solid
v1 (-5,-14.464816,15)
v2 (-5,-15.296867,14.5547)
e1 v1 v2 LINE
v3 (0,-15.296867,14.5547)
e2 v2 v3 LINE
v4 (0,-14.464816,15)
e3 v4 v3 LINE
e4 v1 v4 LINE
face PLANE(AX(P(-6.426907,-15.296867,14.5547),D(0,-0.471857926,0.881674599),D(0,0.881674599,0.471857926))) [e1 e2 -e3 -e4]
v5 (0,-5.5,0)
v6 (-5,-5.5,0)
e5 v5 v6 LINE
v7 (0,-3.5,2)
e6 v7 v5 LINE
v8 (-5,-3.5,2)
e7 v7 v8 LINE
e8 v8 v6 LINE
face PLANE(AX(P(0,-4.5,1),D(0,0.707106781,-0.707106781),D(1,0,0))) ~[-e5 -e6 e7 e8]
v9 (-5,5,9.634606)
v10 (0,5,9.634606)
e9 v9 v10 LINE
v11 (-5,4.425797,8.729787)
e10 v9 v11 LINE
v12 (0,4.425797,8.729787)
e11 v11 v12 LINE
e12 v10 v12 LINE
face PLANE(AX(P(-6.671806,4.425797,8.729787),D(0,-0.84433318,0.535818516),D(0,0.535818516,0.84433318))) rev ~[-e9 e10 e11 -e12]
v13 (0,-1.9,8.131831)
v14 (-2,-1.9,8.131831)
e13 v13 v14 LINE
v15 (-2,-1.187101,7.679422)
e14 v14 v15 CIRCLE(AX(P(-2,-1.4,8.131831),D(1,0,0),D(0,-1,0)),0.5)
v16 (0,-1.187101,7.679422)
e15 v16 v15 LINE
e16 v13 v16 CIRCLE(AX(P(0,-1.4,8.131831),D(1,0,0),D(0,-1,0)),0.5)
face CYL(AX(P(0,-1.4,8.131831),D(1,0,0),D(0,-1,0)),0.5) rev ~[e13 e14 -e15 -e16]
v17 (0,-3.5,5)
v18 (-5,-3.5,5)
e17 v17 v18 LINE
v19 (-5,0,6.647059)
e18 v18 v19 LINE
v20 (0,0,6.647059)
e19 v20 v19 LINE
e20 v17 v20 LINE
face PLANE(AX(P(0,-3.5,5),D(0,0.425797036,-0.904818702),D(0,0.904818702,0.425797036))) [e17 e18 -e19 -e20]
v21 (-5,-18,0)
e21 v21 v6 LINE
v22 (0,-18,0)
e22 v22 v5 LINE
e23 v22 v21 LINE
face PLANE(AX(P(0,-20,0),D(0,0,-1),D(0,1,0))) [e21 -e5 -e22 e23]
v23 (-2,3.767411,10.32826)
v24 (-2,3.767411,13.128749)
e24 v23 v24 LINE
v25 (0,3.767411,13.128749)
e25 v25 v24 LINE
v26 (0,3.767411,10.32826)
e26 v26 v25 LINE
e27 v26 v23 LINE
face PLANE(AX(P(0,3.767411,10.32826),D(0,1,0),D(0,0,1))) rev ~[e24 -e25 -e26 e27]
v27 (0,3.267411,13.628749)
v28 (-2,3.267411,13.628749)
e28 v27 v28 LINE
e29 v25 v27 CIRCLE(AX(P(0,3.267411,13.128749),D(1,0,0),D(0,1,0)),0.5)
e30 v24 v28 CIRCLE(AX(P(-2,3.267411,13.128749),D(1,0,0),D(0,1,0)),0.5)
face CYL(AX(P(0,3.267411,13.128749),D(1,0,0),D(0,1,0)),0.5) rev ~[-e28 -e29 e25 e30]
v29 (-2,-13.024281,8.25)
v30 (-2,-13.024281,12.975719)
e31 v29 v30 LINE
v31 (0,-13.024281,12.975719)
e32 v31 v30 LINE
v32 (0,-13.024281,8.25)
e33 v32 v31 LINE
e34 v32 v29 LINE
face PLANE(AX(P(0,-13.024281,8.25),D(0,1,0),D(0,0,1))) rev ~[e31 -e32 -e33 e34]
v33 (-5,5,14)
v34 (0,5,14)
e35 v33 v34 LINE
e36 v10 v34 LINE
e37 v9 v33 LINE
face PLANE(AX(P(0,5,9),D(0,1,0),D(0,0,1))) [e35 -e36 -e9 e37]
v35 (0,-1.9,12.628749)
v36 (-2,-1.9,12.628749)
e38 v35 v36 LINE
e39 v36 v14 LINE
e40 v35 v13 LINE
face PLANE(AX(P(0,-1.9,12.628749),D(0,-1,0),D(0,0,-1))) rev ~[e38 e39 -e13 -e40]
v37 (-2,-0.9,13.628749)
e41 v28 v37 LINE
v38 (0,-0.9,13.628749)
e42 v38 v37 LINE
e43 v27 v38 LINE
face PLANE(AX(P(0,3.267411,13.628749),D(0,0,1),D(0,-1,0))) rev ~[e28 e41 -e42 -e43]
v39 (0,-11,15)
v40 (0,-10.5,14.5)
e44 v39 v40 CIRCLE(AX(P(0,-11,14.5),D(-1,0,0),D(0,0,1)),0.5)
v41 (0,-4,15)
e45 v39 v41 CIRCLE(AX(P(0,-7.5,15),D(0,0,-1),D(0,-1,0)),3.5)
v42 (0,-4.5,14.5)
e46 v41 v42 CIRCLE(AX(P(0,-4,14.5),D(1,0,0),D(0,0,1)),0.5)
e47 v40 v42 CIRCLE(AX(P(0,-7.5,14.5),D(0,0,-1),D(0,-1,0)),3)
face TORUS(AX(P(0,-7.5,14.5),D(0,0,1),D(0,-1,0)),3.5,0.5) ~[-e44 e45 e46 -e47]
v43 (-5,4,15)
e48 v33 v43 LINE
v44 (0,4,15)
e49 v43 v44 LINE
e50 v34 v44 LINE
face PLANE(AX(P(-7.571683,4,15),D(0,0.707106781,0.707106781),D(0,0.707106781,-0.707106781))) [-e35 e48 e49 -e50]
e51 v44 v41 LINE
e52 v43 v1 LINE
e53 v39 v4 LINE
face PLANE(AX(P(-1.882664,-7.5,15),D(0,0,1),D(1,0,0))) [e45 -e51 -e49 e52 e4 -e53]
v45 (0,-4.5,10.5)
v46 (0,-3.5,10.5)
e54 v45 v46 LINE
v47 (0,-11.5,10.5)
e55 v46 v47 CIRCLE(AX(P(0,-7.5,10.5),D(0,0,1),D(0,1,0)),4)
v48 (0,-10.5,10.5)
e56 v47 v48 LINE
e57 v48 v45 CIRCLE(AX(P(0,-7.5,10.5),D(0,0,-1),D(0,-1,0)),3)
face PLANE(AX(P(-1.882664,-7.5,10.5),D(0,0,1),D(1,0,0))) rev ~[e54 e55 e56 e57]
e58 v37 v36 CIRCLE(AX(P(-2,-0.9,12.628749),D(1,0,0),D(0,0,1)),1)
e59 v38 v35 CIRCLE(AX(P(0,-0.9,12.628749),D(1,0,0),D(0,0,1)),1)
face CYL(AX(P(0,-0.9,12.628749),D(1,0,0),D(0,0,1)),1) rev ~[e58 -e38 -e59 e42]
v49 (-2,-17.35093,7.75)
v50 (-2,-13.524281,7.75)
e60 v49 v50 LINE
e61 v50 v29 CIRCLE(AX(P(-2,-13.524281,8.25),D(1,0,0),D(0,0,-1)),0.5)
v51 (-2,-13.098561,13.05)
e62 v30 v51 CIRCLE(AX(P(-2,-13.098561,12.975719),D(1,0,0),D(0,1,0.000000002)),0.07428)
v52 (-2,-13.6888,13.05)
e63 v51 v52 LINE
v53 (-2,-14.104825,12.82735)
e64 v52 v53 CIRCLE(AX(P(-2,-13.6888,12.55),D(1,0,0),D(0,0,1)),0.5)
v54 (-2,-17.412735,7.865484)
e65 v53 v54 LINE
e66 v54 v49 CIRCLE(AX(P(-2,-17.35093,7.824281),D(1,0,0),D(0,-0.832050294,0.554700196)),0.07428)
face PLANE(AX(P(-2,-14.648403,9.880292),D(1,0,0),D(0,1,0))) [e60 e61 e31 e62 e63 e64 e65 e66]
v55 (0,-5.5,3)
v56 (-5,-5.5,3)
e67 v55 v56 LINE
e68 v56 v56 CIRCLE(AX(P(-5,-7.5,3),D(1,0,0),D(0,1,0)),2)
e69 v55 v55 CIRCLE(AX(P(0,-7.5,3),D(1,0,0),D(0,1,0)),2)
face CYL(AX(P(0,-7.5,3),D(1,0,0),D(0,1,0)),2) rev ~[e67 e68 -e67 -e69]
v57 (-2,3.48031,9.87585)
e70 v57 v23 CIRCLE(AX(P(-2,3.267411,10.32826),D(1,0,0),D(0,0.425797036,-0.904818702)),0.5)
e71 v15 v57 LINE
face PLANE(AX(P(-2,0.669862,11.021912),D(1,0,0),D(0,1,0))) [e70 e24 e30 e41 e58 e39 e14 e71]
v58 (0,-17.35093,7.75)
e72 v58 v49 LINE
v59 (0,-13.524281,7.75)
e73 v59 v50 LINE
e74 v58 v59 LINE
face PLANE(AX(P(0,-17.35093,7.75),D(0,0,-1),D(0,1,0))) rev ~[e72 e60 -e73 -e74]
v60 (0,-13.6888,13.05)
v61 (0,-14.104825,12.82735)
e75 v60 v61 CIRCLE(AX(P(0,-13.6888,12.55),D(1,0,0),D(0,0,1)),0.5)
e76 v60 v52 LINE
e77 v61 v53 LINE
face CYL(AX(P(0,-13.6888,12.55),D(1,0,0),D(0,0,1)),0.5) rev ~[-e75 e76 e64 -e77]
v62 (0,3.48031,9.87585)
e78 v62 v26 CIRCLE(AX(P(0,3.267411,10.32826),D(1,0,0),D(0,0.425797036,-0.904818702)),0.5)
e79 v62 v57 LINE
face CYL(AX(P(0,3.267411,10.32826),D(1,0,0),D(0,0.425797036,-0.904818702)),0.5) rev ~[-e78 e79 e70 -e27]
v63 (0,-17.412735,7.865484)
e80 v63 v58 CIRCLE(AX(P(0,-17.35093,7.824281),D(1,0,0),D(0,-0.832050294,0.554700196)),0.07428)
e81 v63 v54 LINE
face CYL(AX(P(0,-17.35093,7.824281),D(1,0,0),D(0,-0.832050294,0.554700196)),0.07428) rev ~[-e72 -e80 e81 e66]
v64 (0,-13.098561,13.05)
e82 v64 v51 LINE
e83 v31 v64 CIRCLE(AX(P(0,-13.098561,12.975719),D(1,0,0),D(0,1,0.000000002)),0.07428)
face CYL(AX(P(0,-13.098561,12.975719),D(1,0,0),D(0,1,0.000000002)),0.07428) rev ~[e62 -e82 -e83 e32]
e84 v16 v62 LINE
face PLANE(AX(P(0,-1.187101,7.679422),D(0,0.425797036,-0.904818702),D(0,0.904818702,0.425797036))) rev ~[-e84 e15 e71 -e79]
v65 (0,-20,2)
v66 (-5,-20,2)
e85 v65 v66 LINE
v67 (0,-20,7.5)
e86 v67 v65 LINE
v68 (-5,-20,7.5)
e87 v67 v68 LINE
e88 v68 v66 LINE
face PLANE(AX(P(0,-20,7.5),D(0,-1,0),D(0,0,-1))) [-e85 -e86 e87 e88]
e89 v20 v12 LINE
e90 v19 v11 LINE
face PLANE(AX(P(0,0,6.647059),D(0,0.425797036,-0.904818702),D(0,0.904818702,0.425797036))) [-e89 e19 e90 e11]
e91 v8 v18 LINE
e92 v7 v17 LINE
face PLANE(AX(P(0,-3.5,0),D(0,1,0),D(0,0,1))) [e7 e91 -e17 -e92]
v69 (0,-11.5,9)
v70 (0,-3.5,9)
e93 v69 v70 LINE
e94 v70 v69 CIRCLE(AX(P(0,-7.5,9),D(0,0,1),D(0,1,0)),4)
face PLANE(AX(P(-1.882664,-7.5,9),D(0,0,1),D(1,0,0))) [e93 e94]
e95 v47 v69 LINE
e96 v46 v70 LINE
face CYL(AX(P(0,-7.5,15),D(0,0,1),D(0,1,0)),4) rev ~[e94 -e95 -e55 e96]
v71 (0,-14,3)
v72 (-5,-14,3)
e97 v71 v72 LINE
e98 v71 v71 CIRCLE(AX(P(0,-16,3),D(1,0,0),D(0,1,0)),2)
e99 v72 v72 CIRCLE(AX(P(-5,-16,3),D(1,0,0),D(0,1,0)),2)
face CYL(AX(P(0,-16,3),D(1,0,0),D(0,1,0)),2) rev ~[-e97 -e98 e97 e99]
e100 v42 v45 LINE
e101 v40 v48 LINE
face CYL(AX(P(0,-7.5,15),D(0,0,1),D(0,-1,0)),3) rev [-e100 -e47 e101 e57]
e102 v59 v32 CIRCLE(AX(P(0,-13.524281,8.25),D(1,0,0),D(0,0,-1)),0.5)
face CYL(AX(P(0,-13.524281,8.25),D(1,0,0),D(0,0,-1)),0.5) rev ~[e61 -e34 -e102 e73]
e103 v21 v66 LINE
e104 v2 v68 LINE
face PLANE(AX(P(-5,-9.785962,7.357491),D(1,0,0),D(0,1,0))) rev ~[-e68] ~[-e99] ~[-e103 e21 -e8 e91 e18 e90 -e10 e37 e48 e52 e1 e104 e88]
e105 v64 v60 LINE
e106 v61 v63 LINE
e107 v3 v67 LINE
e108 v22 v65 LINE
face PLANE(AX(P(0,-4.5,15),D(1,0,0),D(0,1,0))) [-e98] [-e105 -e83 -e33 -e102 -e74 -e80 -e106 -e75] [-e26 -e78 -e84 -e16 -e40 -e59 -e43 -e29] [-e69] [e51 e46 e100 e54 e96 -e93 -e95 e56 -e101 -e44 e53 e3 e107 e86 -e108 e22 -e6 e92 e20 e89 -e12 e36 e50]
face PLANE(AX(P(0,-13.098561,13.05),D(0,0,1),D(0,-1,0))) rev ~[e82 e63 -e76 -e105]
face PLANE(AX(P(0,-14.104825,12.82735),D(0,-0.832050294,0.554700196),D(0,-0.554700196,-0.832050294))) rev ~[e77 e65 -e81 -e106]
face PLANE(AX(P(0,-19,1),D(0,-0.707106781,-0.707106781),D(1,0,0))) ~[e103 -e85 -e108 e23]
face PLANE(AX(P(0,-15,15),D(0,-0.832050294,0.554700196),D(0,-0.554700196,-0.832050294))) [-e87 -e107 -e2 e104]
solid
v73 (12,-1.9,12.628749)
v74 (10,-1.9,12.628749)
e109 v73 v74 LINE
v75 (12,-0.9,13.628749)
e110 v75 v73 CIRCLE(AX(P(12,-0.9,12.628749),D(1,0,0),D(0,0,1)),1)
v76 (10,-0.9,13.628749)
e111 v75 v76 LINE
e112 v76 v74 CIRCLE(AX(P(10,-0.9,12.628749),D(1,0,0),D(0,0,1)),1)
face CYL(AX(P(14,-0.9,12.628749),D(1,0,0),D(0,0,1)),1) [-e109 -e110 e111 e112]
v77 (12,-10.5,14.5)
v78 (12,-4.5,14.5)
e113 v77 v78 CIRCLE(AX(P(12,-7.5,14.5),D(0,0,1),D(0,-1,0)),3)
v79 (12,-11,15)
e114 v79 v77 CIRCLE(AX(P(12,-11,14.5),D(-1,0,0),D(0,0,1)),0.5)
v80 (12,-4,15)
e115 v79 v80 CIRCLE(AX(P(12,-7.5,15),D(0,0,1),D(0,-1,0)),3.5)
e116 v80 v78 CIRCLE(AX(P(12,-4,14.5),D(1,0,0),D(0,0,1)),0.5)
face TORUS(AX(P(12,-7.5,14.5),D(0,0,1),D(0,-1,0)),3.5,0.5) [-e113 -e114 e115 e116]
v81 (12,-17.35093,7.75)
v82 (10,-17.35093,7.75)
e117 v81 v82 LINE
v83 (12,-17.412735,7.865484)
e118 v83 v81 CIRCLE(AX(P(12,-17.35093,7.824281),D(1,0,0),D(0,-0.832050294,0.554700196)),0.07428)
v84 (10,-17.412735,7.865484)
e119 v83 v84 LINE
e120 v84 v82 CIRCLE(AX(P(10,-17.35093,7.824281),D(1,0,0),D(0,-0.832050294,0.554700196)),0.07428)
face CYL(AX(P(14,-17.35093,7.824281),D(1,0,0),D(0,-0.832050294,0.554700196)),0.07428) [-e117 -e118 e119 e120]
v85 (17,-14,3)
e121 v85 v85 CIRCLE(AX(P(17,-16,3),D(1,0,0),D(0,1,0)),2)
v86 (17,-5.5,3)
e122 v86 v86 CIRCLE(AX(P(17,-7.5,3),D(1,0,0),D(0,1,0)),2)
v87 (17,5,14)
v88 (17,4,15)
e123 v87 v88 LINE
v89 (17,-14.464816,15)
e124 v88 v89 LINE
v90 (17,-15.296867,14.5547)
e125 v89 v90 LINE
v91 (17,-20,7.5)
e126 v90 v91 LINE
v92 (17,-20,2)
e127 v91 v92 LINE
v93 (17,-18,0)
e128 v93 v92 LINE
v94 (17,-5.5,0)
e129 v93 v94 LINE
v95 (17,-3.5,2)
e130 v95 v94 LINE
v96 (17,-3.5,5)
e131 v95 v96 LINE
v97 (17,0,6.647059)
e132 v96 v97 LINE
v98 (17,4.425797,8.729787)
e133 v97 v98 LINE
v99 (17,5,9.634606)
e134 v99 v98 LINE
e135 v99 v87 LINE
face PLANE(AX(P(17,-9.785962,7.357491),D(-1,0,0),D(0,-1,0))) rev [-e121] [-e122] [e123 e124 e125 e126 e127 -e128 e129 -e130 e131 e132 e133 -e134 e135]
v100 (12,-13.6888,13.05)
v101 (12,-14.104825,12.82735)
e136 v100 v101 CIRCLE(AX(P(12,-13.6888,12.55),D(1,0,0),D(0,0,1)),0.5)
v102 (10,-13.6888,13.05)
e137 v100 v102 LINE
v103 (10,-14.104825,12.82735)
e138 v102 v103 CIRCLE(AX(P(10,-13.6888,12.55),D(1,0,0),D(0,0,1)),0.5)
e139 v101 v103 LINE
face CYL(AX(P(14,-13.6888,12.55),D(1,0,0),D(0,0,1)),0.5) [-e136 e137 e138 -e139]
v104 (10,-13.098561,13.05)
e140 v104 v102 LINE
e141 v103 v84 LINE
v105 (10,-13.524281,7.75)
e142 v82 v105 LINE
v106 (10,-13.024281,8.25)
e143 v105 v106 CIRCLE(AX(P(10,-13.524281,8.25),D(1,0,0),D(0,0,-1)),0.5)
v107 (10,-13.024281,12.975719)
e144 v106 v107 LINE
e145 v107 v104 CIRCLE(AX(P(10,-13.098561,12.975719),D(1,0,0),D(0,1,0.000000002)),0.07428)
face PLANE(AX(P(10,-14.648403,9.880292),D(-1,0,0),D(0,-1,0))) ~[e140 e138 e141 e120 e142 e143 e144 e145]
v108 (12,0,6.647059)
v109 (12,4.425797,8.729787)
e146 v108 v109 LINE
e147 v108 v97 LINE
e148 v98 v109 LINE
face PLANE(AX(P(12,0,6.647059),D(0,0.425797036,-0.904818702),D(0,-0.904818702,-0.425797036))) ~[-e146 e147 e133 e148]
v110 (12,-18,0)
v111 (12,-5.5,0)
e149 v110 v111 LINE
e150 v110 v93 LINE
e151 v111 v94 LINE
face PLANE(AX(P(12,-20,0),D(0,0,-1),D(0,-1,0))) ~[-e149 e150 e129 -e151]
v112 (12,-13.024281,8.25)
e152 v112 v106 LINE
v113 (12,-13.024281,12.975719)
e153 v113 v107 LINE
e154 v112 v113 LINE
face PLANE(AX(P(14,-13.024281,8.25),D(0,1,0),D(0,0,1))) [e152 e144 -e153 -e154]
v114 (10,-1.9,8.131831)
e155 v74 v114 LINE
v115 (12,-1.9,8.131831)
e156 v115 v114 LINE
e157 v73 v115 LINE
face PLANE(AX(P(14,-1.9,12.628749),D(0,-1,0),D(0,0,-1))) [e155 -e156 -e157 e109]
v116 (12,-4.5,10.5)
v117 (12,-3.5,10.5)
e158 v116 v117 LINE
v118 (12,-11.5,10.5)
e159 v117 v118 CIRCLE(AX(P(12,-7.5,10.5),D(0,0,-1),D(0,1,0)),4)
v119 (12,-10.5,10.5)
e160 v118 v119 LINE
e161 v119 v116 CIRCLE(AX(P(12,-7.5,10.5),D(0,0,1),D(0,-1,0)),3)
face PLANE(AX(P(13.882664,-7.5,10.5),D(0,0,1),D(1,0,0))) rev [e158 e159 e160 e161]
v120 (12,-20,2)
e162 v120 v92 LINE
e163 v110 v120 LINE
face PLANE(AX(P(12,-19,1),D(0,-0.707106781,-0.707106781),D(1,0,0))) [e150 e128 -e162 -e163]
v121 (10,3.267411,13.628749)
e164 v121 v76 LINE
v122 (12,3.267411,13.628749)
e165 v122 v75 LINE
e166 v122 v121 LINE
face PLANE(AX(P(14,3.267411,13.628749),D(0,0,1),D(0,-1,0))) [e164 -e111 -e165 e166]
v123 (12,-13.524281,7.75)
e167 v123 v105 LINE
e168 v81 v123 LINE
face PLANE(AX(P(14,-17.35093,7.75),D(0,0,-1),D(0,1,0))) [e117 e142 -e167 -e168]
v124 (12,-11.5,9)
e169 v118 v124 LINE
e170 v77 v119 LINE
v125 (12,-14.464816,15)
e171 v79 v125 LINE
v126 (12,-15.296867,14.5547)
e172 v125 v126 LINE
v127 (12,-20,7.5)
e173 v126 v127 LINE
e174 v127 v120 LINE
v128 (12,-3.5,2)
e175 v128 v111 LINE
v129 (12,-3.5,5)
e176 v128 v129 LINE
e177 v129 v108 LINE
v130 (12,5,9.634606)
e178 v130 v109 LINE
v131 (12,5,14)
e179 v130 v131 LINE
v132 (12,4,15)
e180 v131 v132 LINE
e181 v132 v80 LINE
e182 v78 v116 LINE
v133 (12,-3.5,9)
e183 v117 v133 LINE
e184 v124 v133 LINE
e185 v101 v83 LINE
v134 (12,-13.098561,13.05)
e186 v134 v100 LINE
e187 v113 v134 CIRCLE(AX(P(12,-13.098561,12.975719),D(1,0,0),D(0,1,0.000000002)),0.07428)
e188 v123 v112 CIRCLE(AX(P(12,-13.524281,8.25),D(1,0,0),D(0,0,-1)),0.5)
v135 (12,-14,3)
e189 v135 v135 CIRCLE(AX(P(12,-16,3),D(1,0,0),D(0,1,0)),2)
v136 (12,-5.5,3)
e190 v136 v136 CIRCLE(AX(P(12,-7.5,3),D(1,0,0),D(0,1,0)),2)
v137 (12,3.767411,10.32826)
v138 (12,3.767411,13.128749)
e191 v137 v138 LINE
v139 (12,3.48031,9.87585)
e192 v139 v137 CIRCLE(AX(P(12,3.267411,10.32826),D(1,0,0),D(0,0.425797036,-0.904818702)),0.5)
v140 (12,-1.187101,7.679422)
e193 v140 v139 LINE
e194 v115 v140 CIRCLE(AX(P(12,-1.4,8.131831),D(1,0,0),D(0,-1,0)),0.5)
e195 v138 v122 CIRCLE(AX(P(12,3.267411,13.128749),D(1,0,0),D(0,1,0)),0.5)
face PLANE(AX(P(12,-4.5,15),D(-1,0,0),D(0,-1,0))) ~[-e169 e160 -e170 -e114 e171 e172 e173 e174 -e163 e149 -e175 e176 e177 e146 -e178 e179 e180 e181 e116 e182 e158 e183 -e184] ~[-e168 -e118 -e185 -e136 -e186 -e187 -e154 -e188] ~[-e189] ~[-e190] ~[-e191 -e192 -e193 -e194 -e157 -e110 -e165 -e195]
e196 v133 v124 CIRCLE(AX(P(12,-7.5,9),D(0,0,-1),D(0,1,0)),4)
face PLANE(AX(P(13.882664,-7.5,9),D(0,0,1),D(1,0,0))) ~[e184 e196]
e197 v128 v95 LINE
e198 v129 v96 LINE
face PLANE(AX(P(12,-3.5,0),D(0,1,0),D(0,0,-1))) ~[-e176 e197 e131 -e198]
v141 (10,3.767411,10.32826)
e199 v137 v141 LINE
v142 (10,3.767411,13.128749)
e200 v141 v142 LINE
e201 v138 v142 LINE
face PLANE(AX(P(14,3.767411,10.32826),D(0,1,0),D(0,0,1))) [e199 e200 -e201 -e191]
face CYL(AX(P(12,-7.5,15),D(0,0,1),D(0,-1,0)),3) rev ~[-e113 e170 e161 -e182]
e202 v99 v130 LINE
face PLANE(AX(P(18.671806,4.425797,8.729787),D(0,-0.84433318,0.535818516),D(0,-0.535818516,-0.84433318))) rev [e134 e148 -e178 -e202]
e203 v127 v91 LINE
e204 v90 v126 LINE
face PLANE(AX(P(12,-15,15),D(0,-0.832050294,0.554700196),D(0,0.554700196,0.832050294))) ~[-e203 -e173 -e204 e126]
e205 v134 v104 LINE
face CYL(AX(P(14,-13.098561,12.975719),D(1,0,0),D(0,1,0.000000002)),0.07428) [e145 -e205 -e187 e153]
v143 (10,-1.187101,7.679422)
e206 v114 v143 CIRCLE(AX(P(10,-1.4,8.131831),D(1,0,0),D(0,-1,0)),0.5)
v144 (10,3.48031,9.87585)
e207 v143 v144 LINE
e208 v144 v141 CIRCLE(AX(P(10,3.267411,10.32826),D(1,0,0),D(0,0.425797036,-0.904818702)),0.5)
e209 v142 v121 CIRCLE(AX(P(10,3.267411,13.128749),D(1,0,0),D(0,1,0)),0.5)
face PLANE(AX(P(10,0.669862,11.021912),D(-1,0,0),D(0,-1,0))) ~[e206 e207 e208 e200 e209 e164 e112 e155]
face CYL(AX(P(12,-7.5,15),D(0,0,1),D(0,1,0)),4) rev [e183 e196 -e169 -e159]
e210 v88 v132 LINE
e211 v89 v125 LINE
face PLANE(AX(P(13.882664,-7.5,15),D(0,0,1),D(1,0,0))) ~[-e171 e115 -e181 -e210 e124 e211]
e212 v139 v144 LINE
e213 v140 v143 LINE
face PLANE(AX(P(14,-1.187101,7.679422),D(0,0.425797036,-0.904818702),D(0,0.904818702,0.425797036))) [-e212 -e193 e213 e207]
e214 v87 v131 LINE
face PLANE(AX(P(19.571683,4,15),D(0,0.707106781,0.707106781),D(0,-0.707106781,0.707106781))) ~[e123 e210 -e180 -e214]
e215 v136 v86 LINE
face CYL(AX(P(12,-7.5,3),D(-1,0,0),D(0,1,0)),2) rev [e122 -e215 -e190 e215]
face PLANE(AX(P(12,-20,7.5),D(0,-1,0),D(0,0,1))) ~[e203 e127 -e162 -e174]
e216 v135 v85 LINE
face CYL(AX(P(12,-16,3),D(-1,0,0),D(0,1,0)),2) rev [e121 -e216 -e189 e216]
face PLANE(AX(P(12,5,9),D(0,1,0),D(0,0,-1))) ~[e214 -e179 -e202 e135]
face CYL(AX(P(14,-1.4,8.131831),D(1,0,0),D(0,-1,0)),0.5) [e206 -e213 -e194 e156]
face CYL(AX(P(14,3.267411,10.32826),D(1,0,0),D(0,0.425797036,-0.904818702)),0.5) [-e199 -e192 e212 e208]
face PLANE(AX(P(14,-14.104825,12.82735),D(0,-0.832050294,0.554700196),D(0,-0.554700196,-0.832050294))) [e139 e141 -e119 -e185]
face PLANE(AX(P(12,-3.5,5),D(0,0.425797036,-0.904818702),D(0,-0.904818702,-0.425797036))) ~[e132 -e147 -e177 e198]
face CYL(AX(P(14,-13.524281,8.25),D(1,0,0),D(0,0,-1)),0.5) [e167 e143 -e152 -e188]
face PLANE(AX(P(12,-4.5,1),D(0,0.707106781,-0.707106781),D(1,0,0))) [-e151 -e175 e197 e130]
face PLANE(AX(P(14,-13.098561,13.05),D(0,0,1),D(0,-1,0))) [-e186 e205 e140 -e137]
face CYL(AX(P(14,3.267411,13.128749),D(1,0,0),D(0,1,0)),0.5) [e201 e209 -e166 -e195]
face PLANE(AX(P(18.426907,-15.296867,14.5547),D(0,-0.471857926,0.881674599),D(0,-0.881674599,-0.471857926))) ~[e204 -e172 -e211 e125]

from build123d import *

# Parameters (mm, degrees)
F1_DEPTH     = 5
F3_DEPTH     = 6
F4_DEPTH     = 4.5
F5_R         = 0.5
F7_DEPTH     = 2
F6_R         = 2
F8_DEPTH     = 25
F9_SIZE      = 2
F10_T1_DEPTH = 10.1433659759
F10_T3_DEPTH = 8.3436121046
F10_T5_DEPTH = 7.853814506
F15_DEPTH    = 4


# Not quite as in the source:
# - a fillet or chamfer that OpenCascade refuses, or shapes differently, is made with other operations: its cross-section is extruded or revolved along the edge and cut away or added


with BuildPart() as f1:
    # F0 (on Right) → F1 (new body)
    with BuildSketch(Plane.YZ):
        Polygon((0, 6.6470588235), (0, 15), (-15, 15), (-20, 7.5), (-20, 0), (-15, 0), (-3.5, 0), (-3.5, 5), align=None)
        Polygon((5, 15), (0, 15), (0, 6.6470588235), (5, 9), align=None)
    extrude(amount=-F1_DEPTH)

    # F2 (on face) → F3 (cut)
    with BuildSketch(Plane.XY.offset(15)):
        with BuildLine():
            Line((0, -4.5), (0, -3.5))
            ThreePointArc((0, -3.5), (-4, -7.5), (0, -11.5))
            Line((0, -11.5), (0, -10.5))
            ThreePointArc((0, -10.5), (-3, -7.5), (0, -4.5))
        make_face()
        with BuildLine():
            Line((0, -10.5), (0, -4.5))
            ThreePointArc((0, -4.5), (-3, -7.5), (0, -10.5))
        make_face()
    extrude(amount=-F3_DEPTH, mode=Mode.SUBTRACT)

    # F2 (on face) → F4 (join)
    with BuildSketch(Plane.XY.offset(15)):
        with BuildLine():
            Line((0, -4.5), (0, -3.5))
            ThreePointArc((0, -3.5), (-4, -7.5), (0, -11.5))
            Line((0, -11.5), (0, -10.5))
            ThreePointArc((0, -10.5), (-3, -7.5), (0, -4.5))
        make_face()
    extrude(amount=-F4_DEPTH)

    # F5
    f5_edges = [f1.edges().sort_by_distance(p)[0] for p in [
        (-3, -7.5, 15),
    ]]
    fillet(f5_edges, radius=F5_R)

    # F6 (on face) → F7 (cut)
    with BuildSketch(Plane.YZ):
        with BuildLine():
            ThreePointArc((-13.5242807064, 7.7500004351), (-13.1707273158, 7.8964470445), (-13.0242807064, 8.2500004351))
            Line((-13.0242807064, 8.2500004351), (-13.0242807064, 12.9757192936))
            ThreePointArc((-13.0242807064, 12.9757192936), (-13.0460368942, 13.0282433771), (-13.0985609777, 13.0499995649))
            Line((-13.0985609777, 13.0499995649), (-13.6887995588, 13.0499995649))
            ThreePointArc((-13.6887995588, 13.0499995649), (-13.9247285216, 12.9908368643), (-14.104824706, 12.827349663))
            Line((-14.104824706, 12.827349663), (-17.4127351563, 7.8654839875))
            ThreePointArc((-17.4127351563, 7.8654839875), (-17.4164212631, 7.7892309717), (-17.3509302347, 7.7500004351))
            Line((-17.3509302347, 7.7500004351), (-13.5242807064, 7.7500004351))
        make_face()
        with BuildLine():
            Line((3.7674111893, 10.3282596764), (3.7674111893, 13.1287492136))
            ThreePointArc((3.7674111893, 13.1287492136), (3.6209645799, 13.4823026042), (3.2674111893, 13.6287492136))
            Line((3.2674111893, 13.6287492136), (-0.9, 13.6287492136))
            ThreePointArc((-0.9, 13.6287492136), (-1.6071067812, 13.3358559948), (-1.9, 12.6287492136))
            Line((-1.9, 12.6287492136), (-1.9, 8.1318308814))
            ThreePointArc((-1.9, 8.1318308814), (-1.6679092579, 7.7096642916), (-1.1871014818, 7.6794215303))
            Line((-1.1871014818, 7.6794215303), (3.4803097074, 9.8758503253))
            ThreePointArc((3.4803097074, 9.8758503253), (3.6895777791, 10.0603504185), (3.7674111893, 10.3282596764))
        make_face()
    extrude(amount=-F7_DEPTH, mode=Mode.SUBTRACT)

    # F6 (on face) → F8 (cut)
    with BuildSketch(Plane.YZ):
        with Locations((-16, 3)):
            Circle(F6_R)
        with Locations((-7.5, 3)):
            Circle(F6_R)
    extrude(amount=-F8_DEPTH, mode=Mode.SUBTRACT)

    # F9
    f9_edges = [f1.edges().sort_by_distance(p)[0] for p in [
        (-2.5, -20, 0),
        (-2.5, -3.5, 0),
    ]]
    chamfer(f9_edges, length=F9_SIZE)

    # F10: chamfer of 1 on 3 edges, made by hand

    # F10_s2 → F10_t1 (cut)
    with BuildSketch(Plane.YZ.offset(-7.571682988)):
        Polygon((4, 15), (5, 14), (5, 15), align=None)
    extrude(amount=F10_T1_DEPTH, mode=Mode.SUBTRACT)

    # F10_s4 → F10_t3 (cut)
    with BuildSketch(Plane.YZ.offset(-6.6718060523)):
        Polygon((4.4257970363, 8.7297868406), (5, 9.6346055428), (5, 9), align=None)
    extrude(amount=F10_T3_DEPTH, mode=Mode.SUBTRACT)

    # F10_s6 → F10_t5 (cut)
    with BuildSketch(Plane.YZ.offset(-6.426907253)):
        Polygon((-15.2968665358, 14.5547001962), (-14.4648162415, 15), (-15, 15), align=None)
    extrude(amount=F10_T5_DEPTH, mode=Mode.SUBTRACT)


with BuildPart() as f14_1:
    # F14: instance of F1
    add(f1.part.mirror(Plane.YZ.offset(6)))

    # F15 (add): faces of the model
    f15_faces = [f14_1.faces().sort_by_distance(p)[0] for p in [
        (14, 0.7023595879, 11.0891845918),
        (14, -14.5715468985, 9.8270536303),
    ]]
    extrude(f15_faces, amount=F15_DEPTH)


solid = Compound([f1.part, f14_1.part])
